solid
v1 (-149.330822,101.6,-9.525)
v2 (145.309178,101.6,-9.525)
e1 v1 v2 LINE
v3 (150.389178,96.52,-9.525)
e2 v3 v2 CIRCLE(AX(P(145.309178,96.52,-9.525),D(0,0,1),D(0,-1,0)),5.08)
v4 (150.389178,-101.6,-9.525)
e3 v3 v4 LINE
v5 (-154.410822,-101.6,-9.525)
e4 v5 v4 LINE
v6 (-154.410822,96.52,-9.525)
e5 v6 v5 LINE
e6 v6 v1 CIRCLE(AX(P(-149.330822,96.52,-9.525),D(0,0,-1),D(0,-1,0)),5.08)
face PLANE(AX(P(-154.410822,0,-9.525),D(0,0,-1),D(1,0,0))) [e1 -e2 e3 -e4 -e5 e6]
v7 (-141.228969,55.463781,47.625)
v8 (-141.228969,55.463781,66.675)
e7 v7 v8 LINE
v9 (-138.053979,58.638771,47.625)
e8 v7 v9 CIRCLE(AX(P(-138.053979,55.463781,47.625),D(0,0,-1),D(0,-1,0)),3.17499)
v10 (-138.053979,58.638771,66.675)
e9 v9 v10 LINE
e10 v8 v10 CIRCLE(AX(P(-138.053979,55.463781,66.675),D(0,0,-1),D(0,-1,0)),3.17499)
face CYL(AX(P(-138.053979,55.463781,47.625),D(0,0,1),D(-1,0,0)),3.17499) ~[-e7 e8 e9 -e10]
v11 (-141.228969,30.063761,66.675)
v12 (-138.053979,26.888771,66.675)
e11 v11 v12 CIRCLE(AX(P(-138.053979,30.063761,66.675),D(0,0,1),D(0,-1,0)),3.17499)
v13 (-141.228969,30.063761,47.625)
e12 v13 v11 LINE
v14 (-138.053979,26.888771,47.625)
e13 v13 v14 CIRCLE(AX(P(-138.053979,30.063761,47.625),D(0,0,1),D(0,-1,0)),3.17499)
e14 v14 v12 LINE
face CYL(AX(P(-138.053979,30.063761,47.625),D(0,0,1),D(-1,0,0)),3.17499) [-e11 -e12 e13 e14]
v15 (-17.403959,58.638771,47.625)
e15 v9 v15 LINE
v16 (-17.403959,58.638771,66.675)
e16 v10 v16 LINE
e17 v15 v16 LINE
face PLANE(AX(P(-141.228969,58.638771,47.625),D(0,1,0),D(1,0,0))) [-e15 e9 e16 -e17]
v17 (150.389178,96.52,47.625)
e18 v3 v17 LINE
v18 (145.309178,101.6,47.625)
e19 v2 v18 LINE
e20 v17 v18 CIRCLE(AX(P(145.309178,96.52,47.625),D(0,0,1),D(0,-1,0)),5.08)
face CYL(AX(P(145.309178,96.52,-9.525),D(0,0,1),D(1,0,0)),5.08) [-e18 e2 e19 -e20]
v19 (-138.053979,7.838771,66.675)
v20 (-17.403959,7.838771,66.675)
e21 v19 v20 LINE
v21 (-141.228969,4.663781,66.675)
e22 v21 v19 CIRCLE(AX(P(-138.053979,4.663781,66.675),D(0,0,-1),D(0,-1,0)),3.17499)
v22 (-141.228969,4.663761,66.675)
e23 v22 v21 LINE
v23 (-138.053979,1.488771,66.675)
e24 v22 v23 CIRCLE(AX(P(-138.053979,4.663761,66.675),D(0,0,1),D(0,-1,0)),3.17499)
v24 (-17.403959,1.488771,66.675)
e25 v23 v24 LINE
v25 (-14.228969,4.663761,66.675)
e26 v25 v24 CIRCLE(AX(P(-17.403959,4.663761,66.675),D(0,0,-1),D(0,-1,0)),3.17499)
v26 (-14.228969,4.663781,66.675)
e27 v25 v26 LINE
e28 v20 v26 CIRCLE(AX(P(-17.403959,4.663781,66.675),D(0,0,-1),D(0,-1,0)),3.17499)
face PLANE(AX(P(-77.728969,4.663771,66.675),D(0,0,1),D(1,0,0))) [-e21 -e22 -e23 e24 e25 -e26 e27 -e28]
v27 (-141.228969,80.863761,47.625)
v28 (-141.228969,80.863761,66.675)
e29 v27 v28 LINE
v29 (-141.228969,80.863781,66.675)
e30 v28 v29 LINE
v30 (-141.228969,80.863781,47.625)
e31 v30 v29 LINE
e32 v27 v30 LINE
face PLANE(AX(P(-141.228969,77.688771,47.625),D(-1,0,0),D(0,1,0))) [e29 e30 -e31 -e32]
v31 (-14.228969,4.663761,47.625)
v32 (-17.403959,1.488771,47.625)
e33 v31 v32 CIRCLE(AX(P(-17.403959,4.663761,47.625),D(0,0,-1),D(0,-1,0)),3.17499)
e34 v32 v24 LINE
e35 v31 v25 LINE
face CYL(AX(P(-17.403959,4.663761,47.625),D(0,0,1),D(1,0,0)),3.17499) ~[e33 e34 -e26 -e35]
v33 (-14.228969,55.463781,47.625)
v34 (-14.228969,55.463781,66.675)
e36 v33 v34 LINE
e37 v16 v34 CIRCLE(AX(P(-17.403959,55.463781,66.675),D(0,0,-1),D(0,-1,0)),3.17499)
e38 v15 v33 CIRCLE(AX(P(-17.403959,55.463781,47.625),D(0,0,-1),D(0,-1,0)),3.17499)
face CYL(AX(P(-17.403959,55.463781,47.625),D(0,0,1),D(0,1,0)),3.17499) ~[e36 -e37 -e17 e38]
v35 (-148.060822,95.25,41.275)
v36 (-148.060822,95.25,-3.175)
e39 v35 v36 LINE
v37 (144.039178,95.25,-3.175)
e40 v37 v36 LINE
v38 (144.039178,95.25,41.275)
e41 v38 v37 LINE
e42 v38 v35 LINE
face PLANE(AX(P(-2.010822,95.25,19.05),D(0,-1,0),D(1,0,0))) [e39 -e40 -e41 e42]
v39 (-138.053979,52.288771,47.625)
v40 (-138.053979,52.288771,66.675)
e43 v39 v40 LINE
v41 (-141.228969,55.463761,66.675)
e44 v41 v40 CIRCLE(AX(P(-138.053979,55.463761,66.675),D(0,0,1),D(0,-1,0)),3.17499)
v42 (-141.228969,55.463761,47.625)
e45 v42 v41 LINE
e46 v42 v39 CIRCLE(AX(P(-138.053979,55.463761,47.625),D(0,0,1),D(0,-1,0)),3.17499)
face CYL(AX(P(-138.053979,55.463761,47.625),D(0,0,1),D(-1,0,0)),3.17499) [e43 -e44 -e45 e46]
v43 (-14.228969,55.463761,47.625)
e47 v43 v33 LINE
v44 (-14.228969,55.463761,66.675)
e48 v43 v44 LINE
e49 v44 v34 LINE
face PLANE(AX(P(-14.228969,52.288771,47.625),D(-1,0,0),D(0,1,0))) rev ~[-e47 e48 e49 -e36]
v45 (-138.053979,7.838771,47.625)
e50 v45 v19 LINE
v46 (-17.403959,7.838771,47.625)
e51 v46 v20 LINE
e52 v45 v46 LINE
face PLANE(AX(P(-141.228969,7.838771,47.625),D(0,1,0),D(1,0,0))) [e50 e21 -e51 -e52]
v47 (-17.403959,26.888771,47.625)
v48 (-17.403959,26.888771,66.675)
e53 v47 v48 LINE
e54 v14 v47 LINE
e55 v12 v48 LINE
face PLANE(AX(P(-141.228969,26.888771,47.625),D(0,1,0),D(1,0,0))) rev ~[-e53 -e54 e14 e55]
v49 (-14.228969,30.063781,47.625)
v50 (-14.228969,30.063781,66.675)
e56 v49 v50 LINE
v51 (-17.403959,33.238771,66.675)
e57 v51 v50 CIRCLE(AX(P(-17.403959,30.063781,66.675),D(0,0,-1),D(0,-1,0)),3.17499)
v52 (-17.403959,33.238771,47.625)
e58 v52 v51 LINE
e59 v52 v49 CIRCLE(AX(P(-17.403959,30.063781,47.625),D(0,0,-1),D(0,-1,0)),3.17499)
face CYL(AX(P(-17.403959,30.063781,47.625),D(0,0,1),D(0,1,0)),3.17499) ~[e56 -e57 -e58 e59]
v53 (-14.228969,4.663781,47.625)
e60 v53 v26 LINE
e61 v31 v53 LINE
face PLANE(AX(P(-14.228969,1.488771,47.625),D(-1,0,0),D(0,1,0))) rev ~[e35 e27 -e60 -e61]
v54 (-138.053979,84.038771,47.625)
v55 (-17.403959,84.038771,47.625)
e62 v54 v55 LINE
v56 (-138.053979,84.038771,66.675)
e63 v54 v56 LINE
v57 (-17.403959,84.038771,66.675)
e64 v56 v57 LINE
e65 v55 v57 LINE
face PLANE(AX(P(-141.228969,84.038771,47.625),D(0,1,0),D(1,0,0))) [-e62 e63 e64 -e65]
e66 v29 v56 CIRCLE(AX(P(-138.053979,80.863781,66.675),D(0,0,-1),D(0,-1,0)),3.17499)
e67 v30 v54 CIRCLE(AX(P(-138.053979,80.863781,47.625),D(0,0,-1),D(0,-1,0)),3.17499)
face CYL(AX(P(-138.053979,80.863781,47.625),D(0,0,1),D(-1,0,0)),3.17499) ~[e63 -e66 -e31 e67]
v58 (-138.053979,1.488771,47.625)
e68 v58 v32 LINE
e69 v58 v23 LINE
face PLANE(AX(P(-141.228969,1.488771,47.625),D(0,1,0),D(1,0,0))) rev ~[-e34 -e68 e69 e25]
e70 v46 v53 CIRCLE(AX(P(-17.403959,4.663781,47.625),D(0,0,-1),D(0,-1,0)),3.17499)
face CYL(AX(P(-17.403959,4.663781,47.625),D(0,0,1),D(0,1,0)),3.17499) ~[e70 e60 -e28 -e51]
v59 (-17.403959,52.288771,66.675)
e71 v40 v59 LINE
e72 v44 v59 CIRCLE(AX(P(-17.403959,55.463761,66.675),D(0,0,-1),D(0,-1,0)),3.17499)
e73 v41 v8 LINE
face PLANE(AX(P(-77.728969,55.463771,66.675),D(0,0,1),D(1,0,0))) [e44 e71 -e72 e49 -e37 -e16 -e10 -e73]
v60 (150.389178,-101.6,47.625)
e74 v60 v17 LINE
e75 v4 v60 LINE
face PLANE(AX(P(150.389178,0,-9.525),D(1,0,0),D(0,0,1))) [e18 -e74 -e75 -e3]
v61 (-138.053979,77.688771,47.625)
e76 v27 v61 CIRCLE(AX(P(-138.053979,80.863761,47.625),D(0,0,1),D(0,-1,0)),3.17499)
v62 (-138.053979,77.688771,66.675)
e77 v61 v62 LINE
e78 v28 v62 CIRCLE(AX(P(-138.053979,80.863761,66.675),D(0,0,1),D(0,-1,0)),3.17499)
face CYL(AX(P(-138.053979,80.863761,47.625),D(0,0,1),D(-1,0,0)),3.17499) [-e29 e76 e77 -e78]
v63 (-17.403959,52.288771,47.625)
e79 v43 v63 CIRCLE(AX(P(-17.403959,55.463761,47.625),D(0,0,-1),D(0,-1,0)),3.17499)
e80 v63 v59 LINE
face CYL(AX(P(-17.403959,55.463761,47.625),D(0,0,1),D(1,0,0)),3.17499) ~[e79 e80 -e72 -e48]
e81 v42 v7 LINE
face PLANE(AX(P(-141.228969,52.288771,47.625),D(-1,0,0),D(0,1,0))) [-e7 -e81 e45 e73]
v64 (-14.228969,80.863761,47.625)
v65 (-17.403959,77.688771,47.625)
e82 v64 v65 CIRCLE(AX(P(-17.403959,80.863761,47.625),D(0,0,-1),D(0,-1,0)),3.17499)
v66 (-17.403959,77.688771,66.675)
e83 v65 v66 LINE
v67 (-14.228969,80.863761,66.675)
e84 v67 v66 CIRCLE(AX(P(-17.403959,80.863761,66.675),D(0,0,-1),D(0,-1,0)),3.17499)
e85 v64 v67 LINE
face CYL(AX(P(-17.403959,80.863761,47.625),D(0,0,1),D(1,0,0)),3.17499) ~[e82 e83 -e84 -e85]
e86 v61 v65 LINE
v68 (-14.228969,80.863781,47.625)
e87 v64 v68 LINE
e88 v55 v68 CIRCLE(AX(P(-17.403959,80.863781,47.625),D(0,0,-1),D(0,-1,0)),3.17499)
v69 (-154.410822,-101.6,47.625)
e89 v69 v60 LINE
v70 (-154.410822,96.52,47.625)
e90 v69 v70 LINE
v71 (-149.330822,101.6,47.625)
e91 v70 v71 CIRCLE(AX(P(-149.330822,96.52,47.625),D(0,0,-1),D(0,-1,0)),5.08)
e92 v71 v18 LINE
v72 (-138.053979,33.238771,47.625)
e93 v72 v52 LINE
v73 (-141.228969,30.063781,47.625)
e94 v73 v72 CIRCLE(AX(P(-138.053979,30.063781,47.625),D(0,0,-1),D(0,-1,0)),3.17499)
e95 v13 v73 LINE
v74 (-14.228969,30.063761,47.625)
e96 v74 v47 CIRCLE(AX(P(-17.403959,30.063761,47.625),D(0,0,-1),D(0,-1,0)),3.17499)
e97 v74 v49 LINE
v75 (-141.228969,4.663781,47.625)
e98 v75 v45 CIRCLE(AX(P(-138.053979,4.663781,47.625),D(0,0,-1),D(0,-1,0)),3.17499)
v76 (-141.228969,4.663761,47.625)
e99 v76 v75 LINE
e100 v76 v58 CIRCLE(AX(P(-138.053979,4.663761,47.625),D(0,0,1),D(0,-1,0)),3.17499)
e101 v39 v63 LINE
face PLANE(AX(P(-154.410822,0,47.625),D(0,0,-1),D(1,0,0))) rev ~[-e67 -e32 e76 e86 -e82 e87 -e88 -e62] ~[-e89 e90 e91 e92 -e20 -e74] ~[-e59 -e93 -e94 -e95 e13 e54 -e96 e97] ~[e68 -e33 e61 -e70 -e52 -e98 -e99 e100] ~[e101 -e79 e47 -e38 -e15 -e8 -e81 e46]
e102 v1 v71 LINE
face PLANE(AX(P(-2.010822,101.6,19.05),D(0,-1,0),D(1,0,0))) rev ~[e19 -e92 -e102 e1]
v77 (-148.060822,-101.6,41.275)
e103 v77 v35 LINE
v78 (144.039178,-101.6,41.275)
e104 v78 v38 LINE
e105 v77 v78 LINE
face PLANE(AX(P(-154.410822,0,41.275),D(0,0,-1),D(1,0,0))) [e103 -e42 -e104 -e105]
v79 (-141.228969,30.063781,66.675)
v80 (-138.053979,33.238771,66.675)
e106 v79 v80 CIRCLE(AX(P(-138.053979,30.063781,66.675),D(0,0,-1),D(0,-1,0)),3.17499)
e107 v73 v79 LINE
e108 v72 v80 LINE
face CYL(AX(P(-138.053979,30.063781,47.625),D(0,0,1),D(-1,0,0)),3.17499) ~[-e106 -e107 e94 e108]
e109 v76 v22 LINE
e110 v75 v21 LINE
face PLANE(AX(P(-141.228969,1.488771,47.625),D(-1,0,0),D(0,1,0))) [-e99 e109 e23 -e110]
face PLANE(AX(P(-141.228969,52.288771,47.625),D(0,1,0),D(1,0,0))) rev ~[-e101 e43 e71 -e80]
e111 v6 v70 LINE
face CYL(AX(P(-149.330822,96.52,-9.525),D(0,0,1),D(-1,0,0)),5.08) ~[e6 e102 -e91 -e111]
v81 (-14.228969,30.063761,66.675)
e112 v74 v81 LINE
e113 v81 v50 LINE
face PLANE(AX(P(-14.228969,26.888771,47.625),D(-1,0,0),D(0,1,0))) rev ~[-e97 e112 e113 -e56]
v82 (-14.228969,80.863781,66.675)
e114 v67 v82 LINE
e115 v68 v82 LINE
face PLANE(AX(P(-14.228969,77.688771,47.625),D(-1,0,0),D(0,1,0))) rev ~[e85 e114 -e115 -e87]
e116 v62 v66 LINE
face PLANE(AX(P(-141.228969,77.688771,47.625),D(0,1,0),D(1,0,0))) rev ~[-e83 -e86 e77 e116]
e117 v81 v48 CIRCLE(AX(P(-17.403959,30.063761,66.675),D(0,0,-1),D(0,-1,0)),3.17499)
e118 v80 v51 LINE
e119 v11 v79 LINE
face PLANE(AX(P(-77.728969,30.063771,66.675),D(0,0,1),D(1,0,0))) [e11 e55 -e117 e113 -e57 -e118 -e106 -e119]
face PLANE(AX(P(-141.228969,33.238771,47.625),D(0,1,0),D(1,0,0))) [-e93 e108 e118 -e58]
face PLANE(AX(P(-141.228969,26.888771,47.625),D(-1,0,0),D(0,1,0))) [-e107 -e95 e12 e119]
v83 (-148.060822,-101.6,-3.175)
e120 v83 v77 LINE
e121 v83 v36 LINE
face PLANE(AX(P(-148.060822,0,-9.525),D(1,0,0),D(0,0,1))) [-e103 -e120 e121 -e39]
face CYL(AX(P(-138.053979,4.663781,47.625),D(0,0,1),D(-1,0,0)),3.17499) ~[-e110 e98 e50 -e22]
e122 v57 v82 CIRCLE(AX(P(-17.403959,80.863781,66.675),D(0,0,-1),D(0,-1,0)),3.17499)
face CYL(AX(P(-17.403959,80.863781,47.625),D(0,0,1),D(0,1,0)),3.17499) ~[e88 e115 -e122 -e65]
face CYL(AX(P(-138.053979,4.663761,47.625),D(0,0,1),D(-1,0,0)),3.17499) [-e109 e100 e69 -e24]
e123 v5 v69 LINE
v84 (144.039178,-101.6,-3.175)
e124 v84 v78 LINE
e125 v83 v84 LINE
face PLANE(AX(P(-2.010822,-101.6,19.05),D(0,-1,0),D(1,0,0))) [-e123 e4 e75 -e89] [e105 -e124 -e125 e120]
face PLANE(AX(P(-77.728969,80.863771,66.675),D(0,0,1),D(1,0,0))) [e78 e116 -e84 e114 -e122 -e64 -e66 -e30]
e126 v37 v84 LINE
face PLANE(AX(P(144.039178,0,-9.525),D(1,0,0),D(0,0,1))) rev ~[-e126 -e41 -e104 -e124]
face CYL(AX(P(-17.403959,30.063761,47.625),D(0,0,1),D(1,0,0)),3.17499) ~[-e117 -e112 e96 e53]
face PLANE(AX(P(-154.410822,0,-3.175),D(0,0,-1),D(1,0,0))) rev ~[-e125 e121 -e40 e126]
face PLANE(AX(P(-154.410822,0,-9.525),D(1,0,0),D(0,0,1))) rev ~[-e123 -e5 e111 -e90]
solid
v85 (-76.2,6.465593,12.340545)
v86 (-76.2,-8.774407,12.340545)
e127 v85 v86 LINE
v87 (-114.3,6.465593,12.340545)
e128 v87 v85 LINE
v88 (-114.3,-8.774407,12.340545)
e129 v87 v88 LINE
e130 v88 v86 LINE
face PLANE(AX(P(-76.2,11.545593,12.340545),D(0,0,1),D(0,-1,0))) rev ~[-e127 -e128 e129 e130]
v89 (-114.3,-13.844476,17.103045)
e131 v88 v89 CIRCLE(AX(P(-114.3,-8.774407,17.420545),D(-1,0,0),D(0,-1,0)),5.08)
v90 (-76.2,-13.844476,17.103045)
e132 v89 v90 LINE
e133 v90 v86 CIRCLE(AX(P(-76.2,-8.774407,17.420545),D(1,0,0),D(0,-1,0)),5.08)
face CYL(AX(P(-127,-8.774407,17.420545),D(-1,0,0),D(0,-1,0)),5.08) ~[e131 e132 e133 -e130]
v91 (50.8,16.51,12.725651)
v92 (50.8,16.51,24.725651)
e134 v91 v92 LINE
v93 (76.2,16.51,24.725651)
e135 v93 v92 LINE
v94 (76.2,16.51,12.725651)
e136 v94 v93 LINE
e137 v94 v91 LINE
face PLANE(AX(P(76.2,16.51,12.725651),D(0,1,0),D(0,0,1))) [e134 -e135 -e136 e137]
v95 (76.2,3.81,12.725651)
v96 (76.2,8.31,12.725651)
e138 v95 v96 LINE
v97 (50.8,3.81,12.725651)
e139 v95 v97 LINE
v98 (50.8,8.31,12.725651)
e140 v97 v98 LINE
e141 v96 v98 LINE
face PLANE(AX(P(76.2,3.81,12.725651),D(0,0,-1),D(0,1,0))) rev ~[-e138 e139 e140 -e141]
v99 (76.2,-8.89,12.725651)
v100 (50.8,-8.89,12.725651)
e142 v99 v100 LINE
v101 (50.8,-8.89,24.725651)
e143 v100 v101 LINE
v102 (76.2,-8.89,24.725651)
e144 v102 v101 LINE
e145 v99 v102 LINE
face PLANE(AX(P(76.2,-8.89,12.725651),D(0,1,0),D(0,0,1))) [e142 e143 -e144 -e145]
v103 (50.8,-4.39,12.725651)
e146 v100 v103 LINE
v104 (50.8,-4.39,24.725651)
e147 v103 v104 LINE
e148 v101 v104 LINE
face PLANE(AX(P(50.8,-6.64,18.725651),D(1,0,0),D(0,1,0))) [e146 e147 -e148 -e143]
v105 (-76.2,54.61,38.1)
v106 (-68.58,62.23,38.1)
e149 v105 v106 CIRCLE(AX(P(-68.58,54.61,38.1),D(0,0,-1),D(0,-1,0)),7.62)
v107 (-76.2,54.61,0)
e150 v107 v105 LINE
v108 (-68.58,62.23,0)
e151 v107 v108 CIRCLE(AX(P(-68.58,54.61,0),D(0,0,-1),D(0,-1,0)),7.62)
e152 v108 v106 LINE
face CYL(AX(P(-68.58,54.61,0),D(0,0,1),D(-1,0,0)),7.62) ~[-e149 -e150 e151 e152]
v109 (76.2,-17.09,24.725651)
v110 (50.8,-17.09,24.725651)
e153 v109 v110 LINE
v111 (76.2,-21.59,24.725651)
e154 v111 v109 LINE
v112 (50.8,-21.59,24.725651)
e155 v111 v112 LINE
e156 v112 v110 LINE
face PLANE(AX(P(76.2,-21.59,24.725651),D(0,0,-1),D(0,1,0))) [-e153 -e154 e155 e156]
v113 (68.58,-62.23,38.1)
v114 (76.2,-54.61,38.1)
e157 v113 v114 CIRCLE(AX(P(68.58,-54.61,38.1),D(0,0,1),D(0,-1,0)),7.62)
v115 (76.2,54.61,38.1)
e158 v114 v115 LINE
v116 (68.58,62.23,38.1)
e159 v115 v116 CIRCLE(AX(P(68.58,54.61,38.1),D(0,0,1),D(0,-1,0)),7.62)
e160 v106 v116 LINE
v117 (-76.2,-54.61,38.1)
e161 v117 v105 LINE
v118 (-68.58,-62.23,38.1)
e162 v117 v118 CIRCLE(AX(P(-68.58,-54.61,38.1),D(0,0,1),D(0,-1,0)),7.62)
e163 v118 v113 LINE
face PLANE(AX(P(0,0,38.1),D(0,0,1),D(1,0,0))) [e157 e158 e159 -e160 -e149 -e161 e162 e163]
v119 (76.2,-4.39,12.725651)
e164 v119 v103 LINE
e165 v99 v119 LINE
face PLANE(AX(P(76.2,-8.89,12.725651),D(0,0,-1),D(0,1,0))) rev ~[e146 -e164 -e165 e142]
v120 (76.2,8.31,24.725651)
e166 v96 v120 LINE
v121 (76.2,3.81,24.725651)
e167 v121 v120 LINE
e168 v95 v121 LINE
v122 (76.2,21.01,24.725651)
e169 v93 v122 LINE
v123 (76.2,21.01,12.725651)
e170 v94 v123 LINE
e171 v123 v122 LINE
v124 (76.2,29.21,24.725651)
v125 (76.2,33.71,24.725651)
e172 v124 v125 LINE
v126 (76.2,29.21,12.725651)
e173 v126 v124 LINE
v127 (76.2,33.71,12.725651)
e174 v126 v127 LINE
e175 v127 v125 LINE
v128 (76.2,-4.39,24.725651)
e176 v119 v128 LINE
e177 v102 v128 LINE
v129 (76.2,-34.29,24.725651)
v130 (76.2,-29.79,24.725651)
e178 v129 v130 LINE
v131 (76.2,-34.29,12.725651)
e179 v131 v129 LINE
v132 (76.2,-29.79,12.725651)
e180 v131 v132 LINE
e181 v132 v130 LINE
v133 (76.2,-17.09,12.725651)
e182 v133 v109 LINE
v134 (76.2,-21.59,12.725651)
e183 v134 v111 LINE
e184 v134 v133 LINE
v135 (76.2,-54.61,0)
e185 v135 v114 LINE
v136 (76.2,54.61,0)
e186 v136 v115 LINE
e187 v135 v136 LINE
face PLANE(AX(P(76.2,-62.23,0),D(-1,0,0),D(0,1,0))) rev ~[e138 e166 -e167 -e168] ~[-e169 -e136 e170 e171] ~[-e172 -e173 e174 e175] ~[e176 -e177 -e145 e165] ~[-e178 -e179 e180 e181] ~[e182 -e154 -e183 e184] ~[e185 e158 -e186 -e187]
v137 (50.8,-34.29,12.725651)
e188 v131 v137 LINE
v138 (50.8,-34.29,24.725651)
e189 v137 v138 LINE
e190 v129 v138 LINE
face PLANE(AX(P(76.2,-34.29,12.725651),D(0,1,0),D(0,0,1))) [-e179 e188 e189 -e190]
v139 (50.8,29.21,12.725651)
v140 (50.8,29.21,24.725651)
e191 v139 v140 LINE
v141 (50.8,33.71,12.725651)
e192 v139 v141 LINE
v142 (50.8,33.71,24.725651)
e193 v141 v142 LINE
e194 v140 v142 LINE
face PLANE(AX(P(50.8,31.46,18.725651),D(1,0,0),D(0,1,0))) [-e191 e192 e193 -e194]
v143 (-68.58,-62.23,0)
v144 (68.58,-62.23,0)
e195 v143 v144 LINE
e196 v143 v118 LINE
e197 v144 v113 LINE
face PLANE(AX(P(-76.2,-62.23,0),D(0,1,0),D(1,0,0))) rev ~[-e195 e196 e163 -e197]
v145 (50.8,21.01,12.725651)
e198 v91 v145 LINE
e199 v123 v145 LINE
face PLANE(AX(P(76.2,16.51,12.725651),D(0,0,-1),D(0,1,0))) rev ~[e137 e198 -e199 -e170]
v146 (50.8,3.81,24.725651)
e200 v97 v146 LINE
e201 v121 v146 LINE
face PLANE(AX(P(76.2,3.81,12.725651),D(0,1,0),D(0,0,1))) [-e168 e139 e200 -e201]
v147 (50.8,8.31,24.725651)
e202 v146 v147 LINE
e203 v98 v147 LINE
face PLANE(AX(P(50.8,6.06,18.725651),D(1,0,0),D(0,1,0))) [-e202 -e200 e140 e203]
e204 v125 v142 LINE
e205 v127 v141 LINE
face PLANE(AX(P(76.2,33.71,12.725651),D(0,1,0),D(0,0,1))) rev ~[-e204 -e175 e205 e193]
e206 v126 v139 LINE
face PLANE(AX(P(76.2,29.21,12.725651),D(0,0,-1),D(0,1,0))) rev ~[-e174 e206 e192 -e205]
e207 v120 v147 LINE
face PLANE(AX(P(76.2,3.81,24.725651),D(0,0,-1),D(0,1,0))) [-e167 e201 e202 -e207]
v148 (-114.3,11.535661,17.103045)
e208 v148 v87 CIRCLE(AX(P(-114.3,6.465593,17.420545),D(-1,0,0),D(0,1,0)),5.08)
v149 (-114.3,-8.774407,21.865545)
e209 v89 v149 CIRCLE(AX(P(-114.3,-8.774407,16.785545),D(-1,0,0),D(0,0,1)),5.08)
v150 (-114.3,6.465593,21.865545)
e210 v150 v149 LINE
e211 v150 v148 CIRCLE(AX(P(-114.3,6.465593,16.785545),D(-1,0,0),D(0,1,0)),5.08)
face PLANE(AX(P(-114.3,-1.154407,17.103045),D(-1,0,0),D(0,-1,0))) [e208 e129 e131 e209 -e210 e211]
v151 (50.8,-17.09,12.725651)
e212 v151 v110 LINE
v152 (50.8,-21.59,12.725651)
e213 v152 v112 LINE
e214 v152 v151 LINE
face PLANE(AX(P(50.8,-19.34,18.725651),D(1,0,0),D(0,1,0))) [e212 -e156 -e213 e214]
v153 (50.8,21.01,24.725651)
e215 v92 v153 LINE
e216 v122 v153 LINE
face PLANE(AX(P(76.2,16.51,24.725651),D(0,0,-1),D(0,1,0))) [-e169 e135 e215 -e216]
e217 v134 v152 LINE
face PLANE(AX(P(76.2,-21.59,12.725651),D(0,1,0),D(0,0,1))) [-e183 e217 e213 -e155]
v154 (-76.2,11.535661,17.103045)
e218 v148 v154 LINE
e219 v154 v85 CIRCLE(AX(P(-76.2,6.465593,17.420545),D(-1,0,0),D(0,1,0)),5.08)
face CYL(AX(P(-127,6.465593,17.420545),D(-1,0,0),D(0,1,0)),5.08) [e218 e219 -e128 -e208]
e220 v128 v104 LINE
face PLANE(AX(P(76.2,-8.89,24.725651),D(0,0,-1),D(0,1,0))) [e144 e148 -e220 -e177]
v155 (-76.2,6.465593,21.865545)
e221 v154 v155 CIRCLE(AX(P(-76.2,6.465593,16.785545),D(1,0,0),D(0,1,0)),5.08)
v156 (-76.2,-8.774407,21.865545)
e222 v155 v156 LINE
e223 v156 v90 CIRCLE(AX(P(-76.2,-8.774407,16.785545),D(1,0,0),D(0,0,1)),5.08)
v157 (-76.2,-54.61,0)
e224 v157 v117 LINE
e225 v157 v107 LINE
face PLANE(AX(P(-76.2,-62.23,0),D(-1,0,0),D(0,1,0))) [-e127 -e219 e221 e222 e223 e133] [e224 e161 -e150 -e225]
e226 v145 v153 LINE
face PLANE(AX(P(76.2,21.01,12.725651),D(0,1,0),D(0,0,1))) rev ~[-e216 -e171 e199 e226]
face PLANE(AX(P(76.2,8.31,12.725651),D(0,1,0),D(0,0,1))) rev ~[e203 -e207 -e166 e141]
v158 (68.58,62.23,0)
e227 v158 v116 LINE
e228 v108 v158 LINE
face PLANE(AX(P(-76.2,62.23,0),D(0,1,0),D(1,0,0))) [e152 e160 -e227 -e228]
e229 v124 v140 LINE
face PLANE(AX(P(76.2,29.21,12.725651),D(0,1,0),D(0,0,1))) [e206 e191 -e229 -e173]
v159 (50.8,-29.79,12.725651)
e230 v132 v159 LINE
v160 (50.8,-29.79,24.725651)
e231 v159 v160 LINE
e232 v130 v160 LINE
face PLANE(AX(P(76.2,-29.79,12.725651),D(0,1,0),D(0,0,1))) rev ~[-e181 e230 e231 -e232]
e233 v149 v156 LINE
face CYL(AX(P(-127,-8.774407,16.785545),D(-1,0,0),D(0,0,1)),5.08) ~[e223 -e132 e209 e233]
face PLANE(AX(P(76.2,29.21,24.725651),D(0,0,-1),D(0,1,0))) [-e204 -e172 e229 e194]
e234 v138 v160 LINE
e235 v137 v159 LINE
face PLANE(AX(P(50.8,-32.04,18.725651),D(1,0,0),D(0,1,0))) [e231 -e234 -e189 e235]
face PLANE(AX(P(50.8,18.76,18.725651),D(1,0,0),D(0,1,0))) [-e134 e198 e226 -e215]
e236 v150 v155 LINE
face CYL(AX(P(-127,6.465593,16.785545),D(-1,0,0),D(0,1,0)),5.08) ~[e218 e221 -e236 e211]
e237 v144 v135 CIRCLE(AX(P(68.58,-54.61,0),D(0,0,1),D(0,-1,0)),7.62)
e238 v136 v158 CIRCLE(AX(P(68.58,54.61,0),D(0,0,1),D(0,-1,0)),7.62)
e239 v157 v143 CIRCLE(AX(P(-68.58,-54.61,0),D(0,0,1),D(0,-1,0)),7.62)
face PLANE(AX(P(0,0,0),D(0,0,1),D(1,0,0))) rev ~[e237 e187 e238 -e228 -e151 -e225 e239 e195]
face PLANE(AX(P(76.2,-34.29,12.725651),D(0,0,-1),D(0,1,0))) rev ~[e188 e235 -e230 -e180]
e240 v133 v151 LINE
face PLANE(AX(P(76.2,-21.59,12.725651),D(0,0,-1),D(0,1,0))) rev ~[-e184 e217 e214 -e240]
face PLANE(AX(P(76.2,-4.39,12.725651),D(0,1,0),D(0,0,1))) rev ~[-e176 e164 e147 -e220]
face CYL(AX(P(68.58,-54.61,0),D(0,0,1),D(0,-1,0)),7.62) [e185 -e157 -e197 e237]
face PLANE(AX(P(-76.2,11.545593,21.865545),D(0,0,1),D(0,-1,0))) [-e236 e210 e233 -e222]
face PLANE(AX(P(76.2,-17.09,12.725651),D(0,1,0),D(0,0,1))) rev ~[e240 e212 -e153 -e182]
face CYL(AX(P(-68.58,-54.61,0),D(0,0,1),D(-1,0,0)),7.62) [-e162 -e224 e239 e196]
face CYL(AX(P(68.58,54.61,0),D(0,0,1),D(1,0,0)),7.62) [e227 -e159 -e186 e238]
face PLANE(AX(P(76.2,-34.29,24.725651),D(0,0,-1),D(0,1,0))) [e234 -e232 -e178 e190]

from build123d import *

# Parameters (mm, degrees)
F0_W        = 152.4
F0_H        = 124.46
F1_DEPTH    = 38.1
F2_R        = 7.62
F3_W        = 4.5
F3_H        = 12
F4_DEPTH    = 25.4
F5_W        = 25.4
F5_H        = 9.525
F6_DEPTH    = 38.1
F7_T1_DEPTH = 50.8
F8_W        = 304.8
F8_H        = 57.15
F9_DEPTH    = 101.6
F10_T       = -6.35
F11_R       = 5.08
F12_W       = 127
F12_H       = 6.35
F13_DEPTH   = 19.05
F14_R       = 3.17499


# Not quite as in the source:
# - a fillet or chamfer that OpenCascade refuses, or shapes differently, is made with other operations: its cross-section is extruded or revolved along the edge and cut away or added
# - a fillet or chamfer is up to 0.001 mm smaller than in the source, because OpenCascade refuses the exact size


with BuildPart() as f1:
    # F0 (on Top) → F1 (new body)
    with BuildSketch(Plane.XY):
        Rectangle(F0_W, F0_H)
    extrude(amount=F1_DEPTH)

    # F2
    f2_edges = [f1.edges().sort_by_distance(p)[0] for p in [
        (-76.2, -62.23, 19.05),
        (76.2, -62.23, 19.05),
        (76.2, 62.23, 19.05),
        (-76.2, 62.23, 19.05),
    ]]
    fillet(f2_edges, radius=F2_R)

    # F3 (on face) → F4 (cut)
    with BuildSketch(Plane.YZ.offset(76.2)):
        with Locations((-32.04, 18.7256509207)):
            Rectangle(F3_W, F3_H)
        with Locations((-19.34, 18.7256509207)):
            Rectangle(F3_W, F3_H)
        with Locations((-6.64, 18.7256509207)):
            Rectangle(F3_W, F3_H)
        with Locations((6.06, 18.7256509207)):
            Rectangle(F3_W, F3_H)
        with Locations((18.76, 18.7256509207)):
            Rectangle(F3_W, F3_H)
        with Locations((31.46, 18.7256509207)):
            Rectangle(F3_W, F3_H)
    extrude(amount=-F4_DEPTH, mode=Mode.SUBTRACT)

    # F5 (on face) → F6 (join)
    with BuildSketch(Plane(origin=(-76.2, 0, 0), x_dir=(0, -1, 0), z_dir=(-1, 0, 0))):
        with Locations((1.1544073932, 17.1030452147)):
            Rectangle(F5_W, F5_H)
    extrude(amount=F6_DEPTH)

    # F7: fillet of radius 5.08 on 4 edges, made by hand

    # F7_s2 → F7_t1 (cut)
    with BuildSketch(Plane.YZ.offset(-127)):
        with BuildLine():
            ThreePointArc((-8.7744073932, 21.8655452147), (-12.3665098416, 20.3776476631), (-13.8544073932, 16.7855452147))
            Line((-13.8544073932, 16.7855452147), (-13.8544073932, 21.8655452147))
            Line((-13.8544073932, 21.8655452147), (-8.7744073932, 21.8655452147))
        make_face()
        with BuildLine():
            ThreePointArc((-13.8544073932, 17.4205452147), (-12.3665098416, 13.8284427663), (-8.7744073932, 12.3405452147))
            Line((-8.7744073932, 12.3405452147), (-13.8544073932, 12.3405452147))
            Line((-13.8544073932, 12.3405452147), (-13.8544073932, 17.4205452147))
        make_face()
        with BuildLine():
            ThreePointArc((11.5455926068, 16.7855452147), (10.0576950552, 20.3776476631), (6.4655926068, 21.8655452147))
            Line((6.4655926068, 21.8655452147), (11.5455926068, 21.8655452147))
            Line((11.5455926068, 21.8655452147), (11.5455926068, 16.7855452147))
        make_face()
        with BuildLine():
            ThreePointArc((11.5455926068, 17.4205452147), (10.0576950552, 13.8284427663), (6.4655926068, 12.3405452147))
            Line((6.4655926068, 12.3405452147), (11.5455926068, 12.3405452147))
            Line((11.5455926068, 12.3405452147), (11.5455926068, 17.4205452147))
        make_face()
    extrude(amount=F7_T1_DEPTH, mode=Mode.SUBTRACT)


with BuildPart() as f9:
    # F8 (on Front) → F9 (new body, symmetric)
    with BuildSketch(Plane.XZ):
        with Locations((-2.0108222961, 19.05)):
            Rectangle(F8_W, F8_H)
    extrude(amount=F9_DEPTH, both=True)

    # F10
    f10_openings = [f9.faces().sort_by_distance(p)[0] for p in [
        (-2.010822, -101.6, 19.05),
    ]]
    offset(amount=F10_T, openings=f10_openings)

    # F11
    f11_edges = [f9.edges().sort_by_distance(p)[0] for p in [
        (-154.410822, 101.6, 19.05),
        (150.389178, 101.6, 19.05),
    ]]
    fillet(f11_edges, radius=F11_R)

    # F12 (on face) → F13 (join)
    with BuildSketch(Plane.XY.offset(47.625)):
        with Locations((-77.7289685793, 80.8637710965)):
            Rectangle(F12_W, F12_H)
        with Locations((-77.7289685793, 55.4637710965)):
            Rectangle(F12_W, F12_H)
        with Locations((-77.7289685793, 30.0637710965)):
            Rectangle(F12_W, F12_H)
        with Locations((-77.7289685793, 4.6637710965)):
            Rectangle(F12_W, F12_H)
    extrude(amount=F13_DEPTH)

    # F14 (radius 3.175 in the source; OpenCascade refuses exactly that, so slightly less here)
    f14_edges = [f9.edges().sort_by_distance(p)[0] for p in [
        (-141.228969, 84.038771, 57.15),
        (-141.228969, 77.688771, 57.15),
        (-141.228969, 58.638771, 57.15),
        (-141.228969, 33.238771, 57.15),
        (-141.228969, 7.838771, 57.15),
        (-141.228969, 1.488771, 57.15),
        (-14.228969, 77.688771, 57.15),
        (-14.228969, 84.038771, 57.15),
        (-14.228969, 58.638771, 57.15),
        (-14.228969, 52.288771, 57.15),
        (-14.228969, 33.238771, 57.15),
        (-14.228969, 26.888771, 57.15),
        (-14.228969, 7.838771, 57.15),
        (-14.228969, 1.488771, 57.15),
        (-141.228969, 52.288771, 57.15),
        (-141.228969, 26.888771, 57.15),
    ]]
    fillet(f14_edges, radius=F14_R)


solid = Compound([f1.part, f9.part])
